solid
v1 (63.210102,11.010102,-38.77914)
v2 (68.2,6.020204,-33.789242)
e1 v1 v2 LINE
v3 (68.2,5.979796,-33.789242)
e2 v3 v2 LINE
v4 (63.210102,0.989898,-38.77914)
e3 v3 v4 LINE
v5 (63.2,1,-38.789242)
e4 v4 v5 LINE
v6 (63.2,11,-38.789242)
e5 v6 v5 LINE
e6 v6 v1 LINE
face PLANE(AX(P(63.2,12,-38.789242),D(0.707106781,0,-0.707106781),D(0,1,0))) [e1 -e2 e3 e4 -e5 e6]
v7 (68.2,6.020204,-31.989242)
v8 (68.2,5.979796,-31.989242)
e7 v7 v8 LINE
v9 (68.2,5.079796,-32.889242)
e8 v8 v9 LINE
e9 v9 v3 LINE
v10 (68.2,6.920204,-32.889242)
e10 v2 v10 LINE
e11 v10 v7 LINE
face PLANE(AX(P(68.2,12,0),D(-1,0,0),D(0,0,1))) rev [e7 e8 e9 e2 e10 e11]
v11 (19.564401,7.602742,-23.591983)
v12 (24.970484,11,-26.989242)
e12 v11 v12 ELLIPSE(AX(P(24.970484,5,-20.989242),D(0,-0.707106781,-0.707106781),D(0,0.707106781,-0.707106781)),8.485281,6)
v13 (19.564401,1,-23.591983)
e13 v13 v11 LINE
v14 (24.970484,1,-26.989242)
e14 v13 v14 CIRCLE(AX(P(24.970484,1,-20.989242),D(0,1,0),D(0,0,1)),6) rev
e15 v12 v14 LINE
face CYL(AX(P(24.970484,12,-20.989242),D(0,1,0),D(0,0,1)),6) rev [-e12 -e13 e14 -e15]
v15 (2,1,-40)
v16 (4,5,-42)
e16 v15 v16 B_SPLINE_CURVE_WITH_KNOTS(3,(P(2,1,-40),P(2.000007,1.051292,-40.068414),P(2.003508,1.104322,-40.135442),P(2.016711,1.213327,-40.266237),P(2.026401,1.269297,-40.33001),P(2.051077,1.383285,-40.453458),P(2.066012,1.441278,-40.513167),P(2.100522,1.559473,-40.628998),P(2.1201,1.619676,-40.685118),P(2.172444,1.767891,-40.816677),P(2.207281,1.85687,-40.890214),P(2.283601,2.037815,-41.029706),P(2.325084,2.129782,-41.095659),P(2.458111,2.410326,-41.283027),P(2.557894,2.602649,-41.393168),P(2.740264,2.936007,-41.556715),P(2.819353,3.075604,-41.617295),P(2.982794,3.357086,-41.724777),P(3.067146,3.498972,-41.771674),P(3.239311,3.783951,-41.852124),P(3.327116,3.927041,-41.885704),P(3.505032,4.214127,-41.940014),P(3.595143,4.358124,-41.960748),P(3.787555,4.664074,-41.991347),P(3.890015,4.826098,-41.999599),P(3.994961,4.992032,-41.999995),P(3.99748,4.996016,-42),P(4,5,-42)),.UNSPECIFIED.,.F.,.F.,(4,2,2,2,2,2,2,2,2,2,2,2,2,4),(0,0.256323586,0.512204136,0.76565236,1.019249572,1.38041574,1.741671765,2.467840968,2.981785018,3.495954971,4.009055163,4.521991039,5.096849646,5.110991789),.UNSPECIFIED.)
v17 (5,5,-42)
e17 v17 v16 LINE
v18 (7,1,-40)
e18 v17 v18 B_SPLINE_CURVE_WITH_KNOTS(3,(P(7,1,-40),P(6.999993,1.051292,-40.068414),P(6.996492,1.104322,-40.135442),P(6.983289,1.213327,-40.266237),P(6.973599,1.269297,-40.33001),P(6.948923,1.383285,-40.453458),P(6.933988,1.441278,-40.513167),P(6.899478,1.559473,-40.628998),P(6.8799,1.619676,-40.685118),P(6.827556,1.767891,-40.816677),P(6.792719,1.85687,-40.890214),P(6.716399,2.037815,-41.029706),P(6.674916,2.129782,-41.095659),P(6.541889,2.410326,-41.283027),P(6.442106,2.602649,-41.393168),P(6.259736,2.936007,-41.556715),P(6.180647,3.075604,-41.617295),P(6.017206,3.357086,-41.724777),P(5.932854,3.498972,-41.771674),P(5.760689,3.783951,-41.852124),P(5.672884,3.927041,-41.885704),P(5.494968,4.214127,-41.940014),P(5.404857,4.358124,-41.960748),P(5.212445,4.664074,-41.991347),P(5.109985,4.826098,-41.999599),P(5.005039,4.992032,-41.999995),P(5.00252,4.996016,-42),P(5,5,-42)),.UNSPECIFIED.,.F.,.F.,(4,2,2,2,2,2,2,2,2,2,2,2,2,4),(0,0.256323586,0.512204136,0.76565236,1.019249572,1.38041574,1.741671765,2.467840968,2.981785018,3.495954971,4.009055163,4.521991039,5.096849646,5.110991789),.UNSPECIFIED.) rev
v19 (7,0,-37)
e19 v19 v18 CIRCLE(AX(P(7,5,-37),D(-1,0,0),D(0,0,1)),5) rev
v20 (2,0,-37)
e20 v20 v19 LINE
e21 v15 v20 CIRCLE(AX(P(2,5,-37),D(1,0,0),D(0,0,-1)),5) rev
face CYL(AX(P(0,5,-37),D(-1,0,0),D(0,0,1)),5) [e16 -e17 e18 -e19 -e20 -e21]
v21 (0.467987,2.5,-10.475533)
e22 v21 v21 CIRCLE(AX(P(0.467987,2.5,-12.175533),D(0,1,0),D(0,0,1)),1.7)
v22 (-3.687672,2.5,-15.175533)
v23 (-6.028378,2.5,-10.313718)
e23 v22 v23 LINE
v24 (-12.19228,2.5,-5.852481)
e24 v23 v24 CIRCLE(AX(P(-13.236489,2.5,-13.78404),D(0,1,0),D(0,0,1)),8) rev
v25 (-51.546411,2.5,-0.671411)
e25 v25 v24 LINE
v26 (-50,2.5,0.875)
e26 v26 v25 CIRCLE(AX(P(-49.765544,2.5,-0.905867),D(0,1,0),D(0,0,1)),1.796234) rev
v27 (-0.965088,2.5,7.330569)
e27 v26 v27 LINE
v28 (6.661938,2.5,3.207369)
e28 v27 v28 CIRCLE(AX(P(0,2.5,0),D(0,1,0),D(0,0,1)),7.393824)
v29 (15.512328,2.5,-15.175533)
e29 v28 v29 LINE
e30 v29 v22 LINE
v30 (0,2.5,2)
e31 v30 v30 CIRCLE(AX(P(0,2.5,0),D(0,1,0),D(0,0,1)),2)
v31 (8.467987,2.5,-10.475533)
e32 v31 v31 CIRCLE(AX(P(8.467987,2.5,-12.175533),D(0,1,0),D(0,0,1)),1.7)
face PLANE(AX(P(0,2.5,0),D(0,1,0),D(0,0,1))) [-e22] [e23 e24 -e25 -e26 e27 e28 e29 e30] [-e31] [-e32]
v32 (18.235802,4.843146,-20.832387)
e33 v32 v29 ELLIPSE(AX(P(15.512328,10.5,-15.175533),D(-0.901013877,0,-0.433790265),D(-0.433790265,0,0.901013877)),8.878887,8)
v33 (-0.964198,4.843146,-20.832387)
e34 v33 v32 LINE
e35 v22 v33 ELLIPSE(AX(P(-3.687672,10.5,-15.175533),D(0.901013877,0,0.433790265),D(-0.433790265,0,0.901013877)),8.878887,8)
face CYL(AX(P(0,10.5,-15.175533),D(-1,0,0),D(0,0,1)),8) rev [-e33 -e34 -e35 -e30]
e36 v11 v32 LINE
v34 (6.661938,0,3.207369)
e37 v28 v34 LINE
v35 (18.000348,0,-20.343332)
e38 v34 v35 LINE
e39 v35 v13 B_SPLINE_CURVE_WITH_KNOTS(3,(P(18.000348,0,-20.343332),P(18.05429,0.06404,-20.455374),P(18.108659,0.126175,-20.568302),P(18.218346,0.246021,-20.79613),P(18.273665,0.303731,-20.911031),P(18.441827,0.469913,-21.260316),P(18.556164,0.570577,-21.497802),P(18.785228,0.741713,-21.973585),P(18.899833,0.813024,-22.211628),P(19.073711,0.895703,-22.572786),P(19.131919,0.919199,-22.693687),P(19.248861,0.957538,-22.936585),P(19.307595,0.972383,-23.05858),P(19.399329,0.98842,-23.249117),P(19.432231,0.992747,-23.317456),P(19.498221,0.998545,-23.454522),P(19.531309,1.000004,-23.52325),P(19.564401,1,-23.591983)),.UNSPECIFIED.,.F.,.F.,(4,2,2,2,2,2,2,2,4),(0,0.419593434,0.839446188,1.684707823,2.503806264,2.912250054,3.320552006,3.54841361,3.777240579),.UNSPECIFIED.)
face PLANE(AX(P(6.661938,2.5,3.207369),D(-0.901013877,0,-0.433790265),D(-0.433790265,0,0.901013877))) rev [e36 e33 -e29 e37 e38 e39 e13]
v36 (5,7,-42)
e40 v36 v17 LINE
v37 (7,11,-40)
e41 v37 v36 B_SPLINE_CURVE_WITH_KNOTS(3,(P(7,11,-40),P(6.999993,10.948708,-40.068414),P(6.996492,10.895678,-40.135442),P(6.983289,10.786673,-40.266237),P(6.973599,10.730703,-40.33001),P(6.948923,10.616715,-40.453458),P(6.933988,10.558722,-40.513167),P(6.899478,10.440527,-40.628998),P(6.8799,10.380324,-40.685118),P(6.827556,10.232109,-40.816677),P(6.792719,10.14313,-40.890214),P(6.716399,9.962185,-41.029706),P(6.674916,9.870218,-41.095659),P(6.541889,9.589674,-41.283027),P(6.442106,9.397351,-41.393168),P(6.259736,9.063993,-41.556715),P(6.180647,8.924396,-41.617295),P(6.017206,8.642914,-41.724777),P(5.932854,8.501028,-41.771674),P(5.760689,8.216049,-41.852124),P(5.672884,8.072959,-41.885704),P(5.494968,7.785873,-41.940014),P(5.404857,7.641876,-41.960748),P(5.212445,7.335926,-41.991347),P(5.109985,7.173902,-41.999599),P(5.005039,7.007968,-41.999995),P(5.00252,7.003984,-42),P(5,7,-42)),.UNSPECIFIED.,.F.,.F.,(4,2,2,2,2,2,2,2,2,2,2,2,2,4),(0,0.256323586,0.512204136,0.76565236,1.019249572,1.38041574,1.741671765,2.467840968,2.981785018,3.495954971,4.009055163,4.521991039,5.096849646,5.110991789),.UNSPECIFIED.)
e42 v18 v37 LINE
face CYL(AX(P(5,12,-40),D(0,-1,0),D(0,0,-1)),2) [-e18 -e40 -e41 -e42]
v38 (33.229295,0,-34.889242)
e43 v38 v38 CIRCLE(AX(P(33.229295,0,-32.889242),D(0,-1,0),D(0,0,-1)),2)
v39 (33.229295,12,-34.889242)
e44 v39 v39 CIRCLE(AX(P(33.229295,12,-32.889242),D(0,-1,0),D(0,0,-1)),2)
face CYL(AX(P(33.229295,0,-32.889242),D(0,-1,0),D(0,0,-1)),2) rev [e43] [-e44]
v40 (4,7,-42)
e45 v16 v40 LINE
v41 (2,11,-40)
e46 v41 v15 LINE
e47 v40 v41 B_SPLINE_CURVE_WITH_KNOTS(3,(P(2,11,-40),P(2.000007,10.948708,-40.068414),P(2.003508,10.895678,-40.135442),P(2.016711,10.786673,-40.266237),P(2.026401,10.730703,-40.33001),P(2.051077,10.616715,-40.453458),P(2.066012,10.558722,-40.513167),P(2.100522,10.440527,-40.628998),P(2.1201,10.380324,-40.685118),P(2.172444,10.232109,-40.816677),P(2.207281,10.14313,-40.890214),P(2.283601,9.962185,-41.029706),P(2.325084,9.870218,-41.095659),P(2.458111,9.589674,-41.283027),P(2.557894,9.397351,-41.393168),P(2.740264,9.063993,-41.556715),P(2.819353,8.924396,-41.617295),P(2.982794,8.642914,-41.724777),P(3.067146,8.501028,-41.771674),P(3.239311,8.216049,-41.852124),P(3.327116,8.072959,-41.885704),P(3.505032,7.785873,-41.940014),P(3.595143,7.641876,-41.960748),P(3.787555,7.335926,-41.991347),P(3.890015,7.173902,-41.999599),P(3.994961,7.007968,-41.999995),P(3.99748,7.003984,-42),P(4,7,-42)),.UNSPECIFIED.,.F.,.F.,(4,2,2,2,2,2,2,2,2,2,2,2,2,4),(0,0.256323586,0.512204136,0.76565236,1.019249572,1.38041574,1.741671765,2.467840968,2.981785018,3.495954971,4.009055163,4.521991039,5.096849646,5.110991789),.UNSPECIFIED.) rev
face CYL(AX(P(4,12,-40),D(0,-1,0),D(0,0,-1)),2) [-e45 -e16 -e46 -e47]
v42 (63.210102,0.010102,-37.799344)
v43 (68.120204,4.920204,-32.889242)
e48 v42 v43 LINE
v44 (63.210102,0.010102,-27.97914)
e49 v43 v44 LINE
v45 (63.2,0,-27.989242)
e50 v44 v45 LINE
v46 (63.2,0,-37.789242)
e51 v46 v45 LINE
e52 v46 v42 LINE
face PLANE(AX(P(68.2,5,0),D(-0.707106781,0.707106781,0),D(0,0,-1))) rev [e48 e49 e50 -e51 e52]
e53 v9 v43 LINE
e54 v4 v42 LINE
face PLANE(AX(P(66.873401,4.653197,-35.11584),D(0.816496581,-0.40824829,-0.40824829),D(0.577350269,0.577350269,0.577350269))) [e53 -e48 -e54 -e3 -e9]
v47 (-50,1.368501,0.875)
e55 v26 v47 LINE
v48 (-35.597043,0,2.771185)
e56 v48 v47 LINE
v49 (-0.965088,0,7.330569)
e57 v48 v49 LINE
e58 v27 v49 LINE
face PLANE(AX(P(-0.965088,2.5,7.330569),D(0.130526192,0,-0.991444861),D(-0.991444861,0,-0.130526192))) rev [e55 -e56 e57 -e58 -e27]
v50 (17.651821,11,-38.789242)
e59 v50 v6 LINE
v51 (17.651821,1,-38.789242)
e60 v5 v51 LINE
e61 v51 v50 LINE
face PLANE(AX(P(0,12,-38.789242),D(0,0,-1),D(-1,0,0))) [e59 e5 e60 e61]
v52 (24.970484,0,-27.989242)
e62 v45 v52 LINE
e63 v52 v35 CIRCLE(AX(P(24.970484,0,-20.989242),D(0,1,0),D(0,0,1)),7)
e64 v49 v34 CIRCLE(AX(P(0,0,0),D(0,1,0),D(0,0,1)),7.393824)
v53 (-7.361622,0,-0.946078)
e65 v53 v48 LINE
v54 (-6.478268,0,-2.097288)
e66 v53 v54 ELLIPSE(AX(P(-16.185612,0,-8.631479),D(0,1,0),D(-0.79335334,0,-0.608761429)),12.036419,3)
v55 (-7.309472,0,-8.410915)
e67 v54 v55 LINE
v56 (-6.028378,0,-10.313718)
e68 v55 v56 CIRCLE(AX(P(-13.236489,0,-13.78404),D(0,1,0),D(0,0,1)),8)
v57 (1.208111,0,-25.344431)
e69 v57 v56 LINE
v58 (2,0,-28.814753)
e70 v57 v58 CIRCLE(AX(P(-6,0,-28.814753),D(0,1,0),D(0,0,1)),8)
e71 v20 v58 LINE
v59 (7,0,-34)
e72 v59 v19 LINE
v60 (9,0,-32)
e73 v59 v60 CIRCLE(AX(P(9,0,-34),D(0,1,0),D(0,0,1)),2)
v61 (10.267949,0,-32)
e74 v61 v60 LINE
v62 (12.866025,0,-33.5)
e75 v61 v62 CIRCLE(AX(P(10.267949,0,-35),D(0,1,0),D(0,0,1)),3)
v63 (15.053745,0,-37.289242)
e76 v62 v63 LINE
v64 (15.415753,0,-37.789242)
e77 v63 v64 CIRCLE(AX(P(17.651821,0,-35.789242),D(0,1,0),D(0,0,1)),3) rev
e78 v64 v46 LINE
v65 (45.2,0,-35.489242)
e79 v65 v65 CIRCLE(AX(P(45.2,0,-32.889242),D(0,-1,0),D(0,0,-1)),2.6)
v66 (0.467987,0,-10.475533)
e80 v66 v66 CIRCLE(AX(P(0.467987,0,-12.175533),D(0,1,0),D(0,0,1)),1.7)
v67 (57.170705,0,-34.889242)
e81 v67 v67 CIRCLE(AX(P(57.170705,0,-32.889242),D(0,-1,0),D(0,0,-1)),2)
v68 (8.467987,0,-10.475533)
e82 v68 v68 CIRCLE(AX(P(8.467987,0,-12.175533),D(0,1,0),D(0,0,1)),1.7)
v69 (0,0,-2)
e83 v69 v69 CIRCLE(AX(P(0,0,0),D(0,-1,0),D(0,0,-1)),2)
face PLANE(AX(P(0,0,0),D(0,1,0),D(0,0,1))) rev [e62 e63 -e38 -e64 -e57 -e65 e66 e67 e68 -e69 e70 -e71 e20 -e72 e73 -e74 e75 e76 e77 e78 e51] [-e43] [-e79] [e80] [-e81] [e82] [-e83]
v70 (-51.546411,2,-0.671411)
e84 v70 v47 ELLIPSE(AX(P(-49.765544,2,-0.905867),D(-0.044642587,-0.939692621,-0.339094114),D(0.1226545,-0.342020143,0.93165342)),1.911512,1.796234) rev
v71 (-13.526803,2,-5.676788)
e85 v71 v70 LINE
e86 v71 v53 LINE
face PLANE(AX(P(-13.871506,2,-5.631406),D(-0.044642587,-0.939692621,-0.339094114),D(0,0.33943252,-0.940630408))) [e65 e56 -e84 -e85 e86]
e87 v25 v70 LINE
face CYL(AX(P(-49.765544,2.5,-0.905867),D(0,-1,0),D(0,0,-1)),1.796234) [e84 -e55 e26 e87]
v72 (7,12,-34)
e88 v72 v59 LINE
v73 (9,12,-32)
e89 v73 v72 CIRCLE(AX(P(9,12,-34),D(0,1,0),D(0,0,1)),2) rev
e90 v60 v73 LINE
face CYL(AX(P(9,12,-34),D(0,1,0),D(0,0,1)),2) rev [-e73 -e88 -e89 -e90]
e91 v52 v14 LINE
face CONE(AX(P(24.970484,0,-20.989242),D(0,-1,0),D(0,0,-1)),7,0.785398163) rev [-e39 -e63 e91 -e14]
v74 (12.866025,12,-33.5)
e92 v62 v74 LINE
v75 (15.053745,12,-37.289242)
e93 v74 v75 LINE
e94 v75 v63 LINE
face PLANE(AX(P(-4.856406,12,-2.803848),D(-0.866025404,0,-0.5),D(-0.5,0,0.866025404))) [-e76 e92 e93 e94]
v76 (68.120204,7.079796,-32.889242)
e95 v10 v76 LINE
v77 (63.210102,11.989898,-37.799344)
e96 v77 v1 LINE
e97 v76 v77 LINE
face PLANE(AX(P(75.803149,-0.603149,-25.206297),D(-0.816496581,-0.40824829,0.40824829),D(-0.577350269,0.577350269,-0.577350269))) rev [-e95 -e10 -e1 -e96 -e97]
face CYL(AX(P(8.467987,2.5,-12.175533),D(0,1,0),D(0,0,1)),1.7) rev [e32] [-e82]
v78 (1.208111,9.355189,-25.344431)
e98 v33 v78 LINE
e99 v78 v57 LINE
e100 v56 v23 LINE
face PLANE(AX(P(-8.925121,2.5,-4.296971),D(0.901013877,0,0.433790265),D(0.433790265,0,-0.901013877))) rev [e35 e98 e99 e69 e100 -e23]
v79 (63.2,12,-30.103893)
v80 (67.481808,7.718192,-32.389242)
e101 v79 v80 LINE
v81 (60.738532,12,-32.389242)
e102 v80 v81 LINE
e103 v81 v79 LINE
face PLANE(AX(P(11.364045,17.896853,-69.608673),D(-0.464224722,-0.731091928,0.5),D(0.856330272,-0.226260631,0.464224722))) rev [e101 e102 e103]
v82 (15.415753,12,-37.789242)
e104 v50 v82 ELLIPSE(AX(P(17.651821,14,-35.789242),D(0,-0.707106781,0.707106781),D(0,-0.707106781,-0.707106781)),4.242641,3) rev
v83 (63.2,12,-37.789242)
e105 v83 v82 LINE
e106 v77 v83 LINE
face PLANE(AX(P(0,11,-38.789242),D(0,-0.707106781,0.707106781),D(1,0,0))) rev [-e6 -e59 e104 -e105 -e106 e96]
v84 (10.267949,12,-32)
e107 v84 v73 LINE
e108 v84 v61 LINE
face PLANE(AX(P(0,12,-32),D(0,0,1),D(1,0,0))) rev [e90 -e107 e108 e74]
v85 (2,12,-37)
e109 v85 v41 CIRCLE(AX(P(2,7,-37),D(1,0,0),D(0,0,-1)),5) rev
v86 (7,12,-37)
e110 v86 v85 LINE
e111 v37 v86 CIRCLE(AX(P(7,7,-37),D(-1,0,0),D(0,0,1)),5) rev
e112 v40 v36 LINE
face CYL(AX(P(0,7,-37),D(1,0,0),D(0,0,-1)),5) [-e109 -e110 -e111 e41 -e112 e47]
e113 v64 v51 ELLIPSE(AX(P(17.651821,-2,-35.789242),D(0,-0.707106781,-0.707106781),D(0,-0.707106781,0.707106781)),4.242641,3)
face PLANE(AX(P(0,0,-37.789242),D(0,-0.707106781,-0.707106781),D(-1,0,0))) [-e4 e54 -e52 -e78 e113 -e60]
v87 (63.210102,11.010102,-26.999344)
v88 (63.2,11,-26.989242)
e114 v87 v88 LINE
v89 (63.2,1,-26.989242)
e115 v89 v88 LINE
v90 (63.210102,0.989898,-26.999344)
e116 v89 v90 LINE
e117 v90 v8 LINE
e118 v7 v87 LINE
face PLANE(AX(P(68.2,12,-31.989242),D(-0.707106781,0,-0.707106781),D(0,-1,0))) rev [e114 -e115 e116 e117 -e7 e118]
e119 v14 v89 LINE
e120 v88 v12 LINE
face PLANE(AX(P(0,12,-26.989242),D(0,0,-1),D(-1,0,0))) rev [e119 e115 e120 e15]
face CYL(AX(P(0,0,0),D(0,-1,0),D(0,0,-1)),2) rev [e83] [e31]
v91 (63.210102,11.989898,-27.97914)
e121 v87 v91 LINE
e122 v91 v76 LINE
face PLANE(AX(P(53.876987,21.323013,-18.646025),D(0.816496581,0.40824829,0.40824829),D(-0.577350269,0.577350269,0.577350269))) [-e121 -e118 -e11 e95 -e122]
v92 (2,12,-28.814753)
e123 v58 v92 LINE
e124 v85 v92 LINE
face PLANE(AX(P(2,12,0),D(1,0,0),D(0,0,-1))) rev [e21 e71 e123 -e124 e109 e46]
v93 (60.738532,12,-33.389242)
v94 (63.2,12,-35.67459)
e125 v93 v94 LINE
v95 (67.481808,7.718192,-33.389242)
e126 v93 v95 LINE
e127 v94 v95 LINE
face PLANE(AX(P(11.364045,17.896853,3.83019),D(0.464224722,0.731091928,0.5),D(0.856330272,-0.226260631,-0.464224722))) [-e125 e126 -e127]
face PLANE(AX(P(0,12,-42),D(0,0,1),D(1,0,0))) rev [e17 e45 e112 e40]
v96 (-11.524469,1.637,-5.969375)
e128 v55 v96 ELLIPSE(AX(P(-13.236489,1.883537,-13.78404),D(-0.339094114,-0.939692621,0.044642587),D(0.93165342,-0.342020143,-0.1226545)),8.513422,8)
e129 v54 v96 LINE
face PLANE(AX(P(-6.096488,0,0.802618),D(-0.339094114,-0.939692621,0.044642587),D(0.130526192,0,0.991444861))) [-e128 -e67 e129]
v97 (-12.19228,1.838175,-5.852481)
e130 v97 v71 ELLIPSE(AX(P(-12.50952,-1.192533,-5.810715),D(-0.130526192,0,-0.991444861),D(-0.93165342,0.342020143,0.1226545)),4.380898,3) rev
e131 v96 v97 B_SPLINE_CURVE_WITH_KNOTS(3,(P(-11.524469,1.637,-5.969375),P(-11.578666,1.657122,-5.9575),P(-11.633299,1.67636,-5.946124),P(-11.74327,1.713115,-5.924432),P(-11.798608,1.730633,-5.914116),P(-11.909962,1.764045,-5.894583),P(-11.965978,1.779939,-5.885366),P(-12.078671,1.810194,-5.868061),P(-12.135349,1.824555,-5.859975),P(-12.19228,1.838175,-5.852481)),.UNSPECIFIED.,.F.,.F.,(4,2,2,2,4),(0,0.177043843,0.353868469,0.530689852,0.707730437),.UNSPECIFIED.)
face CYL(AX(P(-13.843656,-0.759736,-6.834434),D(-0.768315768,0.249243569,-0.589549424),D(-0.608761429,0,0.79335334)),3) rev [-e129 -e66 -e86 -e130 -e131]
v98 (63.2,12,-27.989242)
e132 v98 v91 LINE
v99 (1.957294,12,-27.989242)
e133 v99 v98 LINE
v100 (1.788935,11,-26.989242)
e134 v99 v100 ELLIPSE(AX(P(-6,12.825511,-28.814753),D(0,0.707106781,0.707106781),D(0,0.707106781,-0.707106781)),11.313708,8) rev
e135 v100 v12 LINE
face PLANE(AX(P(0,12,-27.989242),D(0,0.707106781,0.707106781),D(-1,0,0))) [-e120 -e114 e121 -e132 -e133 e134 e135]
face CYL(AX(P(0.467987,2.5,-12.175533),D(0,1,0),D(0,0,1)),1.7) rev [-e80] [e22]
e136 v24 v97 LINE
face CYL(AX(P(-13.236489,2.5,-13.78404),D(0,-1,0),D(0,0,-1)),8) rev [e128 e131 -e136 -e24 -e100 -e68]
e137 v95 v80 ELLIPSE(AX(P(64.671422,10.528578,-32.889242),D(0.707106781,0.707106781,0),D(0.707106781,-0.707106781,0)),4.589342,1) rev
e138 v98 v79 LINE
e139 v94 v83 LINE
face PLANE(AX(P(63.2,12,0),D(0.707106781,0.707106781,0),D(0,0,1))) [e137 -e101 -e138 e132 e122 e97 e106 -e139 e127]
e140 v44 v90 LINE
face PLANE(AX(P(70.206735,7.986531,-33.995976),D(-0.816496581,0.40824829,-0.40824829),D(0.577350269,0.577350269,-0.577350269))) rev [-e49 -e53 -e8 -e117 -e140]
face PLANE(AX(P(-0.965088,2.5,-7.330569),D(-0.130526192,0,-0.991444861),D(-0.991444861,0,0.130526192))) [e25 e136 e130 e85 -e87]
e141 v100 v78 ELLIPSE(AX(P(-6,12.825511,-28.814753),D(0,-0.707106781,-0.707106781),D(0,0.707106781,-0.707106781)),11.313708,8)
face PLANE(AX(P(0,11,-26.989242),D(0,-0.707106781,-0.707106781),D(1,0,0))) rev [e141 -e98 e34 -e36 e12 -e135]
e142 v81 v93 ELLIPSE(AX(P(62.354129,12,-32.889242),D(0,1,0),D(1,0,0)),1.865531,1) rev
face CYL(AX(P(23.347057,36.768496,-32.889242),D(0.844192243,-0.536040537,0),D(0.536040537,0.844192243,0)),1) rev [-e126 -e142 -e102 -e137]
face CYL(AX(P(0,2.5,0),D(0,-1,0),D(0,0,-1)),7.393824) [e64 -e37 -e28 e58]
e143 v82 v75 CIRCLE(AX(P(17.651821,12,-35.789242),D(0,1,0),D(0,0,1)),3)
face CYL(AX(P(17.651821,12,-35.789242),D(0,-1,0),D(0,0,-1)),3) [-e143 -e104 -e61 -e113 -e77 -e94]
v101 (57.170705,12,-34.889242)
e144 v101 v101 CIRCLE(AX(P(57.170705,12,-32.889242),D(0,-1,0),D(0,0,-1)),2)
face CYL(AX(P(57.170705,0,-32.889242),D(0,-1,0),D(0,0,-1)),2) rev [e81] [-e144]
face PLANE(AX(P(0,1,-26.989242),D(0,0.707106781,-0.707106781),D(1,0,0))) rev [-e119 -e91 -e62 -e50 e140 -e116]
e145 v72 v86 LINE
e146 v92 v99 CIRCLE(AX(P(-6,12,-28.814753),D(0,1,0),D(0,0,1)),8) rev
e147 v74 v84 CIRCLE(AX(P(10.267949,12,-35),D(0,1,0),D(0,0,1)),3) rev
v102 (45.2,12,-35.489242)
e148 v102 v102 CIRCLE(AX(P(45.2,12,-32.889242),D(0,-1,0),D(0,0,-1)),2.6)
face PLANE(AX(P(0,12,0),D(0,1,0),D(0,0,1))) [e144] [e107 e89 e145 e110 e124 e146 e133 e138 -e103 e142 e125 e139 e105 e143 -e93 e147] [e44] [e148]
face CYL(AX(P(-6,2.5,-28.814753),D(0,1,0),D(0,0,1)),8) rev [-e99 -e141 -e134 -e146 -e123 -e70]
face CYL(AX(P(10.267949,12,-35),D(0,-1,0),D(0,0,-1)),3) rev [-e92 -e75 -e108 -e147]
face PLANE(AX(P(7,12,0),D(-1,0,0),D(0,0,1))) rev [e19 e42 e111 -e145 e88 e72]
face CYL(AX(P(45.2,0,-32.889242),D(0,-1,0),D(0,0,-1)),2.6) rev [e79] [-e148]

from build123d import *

# Parameters (mm, degrees)
BOSS_EXTRUDE1_DEPTH          = 2.5
BOSS_EXTRUDE2_DEPTH          = 12
F_4_0_4_DIAMETER_HOLE1_D     = 4
F_4_0_4_DIAMETER_HOLE2_D     = 4
F_5_2_5_2_DIAMETER_HOLE1_D   = 5.2
CHAMFER5_SIZE                = 8.5
FILLET13_R                   = 6
CHAMFER1_SIZE                = 5
CHAMFER2_SIZE                = 1
CHAMFER4_SIZE                = 0.8
CUT_REVOLVE1_ANGLE           = 60
CUT_REVOLVE1_OTHER_WAY_ANGLE = 60
FILLET4_R                    = 1
FILLET5_R                    = 8
FILLET6_R                    = 3
FILLET7_R                    = 2
FILLET11_R                   = 5
FILLET12_R                   = 2
CUT_EXTRUDE2_DEPTH           = 38
CHAMFER8_SIZE                = 6.868693549
CHAMFER8_SIZE_2              = 2.5
FILLET14_R                   = 3
M3_CLEARANCE_HOLE1_D         = 3.4


with BuildPart() as part:
    # Sketch1 → Boss-Extrude1 (new body)
    with BuildSketch(Plane(origin=(0, 0, 0), x_dir=(1, 0, 0), z_dir=(0, 1, 0))):
        with BuildLine():
            Line((-7.904447763, 6.416984589), (-51.546411114, 0.671411114))
            ThreePointArc((-51.546411114, 0.671411114), (-51.035673477, -0.364262362), (-50, -0.875))
            Line((-50, -0.875), (-0.965087675, -7.330568677))
            ThreePointArc((-0.965087675, -7.330568677), (3.516208172, -6.504222585), (6.661937904, -3.207368814))
            Line((6.661937904, -3.207368814), (21.2, 26.989241728))
            Line((21.2, 26.989241728), (2, 26.989241728))
            Line((2, 26.989241728), (-7.904447763, 6.416984589))
        make_face()
    extrude(amount=BOSS_EXTRUDE1_DEPTH)

    # Sketch1<6> → Boss-Extrude2 (add)
    with BuildSketch(Plane(origin=(0, 0, 0), x_dir=(1, 0, 0), z_dir=(0, 1, 0))):
        Polygon((2, 42), (2, 26.989241728), (68.2, 26.989241728), (68.2, 38.789241728), (15.919770539, 38.789241728), (12, 32), (7, 32), (7, 42), align=None)
    extrude(amount=BOSS_EXTRUDE2_DEPTH)

    # Ø4.0 (4) Diameter Hole1 (through all)
    with Locations(Plane(origin=(0, 0, 0), x_dir=(-1, 0, 0), z_dir=(0, -1, 0))):
        with Locations((-57.170705016, 32.889241728), (-33.229294984, 32.889241728)):
            Hole(F_4_0_4_DIAMETER_HOLE1_D / 2)

    # Ø4.0 (4) Diameter Hole2 (through all)
    with Locations(Plane(origin=(0, 0, 0), x_dir=(-1, 0, 0), z_dir=(0, -1, 0))):
        with Locations((0, 0)):
            Hole(F_4_0_4_DIAMETER_HOLE2_D / 2)

    # Ø5.2 (5.2) Diameter Hole1 (through all)
    with Locations(Plane(origin=(0, 0, 0), x_dir=(-1, 0, 0), z_dir=(0, -1, 0))):
        with Locations((-45.2, 32.889241728)):
            Hole(F_5_2_5_2_DIAMETER_HOLE1_D / 2)

    # Chamfer5
    chamfer5_edges = [part.edges().sort_by_distance(p)[0] for p in [
        (11.6, 2.5, -26.989241728),
    ]]
    chamfer(chamfer5_edges, length=CHAMFER5_SIZE)

    # Fillet13
    fillet13_edges = [part.edges().sort_by_distance(p)[0] for p in [
        (21.2, 5.5, -26.989241728),
    ]]
    fillet(fillet13_edges, radius=FILLET13_R)

    # Chamfer1
    chamfer1_edges = [part.edges().sort_by_distance(p)[0] for p in [
        (68.2, 0, -32.889241728),
        (68.2, 6, -26.989241728),
        (68.2, 6, -38.789241728),
        (68.2, 12, -32.889241728),
    ]]
    chamfer(chamfer1_edges, length=CHAMFER1_SIZE)

    # Chamfer2
    # the kernel refuses this chamfer: 1 mm, written as the material it takes off along each edge
    with BuildSketch(Plane(origin=(24.970484005, 0, -26.989241728), x_dir=(0, 0, -1), z_dir=(1, 0, 0))) as chamfer2_piece_1:
        Polygon((CHAMFER2_SIZE, 0), (0, CHAMFER2_SIZE), (0, 0), align=None)
    extrude(amount=40.801198983, mode=Mode.SUBTRACT)
    with BuildSketch(Plane(origin=(-0.571682988, 12, -26.989241728), x_dir=(0, -1, 0), z_dir=(1, 0, 0))) as chamfer2_piece_2:
        Polygon((CHAMFER2_SIZE, 0), (0, CHAMFER2_SIZE), (0, 0), align=None)
    extrude(amount=66.343365976, mode=Mode.SUBTRACT)
    with BuildSketch(Plane(origin=(65.771682988, 12, -38.789241728), x_dir=(0, -1, 0), z_dir=(-1, 0, 0)), Plane(origin=(65.771682988, 0, -38.789241728), x_dir=(0, 0, 1), z_dir=(-1, 0, 0))) as chamfer2_piece_3:
        Polygon((CHAMFER2_SIZE, 0), (0, CHAMFER2_SIZE), (0, 0), align=None)
    extrude(amount=52.423595437, mode=Mode.SUBTRACT)
    with BuildSketch(Plane(origin=(24.970484005, 0, -20.989241728), x_dir=(-0.9610284466527214, -1.1097335043339142e-15, 0.27644949760174536), z_dir=(0.27644949760174536, 0, 0.9610284466527214))) as chamfer2_piece_4:
        Polygon((6 + CHAMFER2_SIZE, 0), (6, -CHAMFER2_SIZE), (6, 0), align=None)
    revolve(axis=Axis((24.970484005, 0, -20.989241728), (0, -1, 0)), revolution_arc=106.048413393, mode=Mode.SUBTRACT)

    # Chamfer4
    # the kernel refuses this chamfer: 0.8 mm, written as the material it takes off along each edge
    with BuildSketch(Plane(origin=(62.505076275, -0.694923725, -39.484165453), x_dir=(-0.40824829046386635, -0.4082482904638597, 0.816496580927726), z_dir=(0.5773502691896258, 0.5773502691896258, 0.5773502691896258)), Plane(origin=(62.505076275, 12.694923725, -39.484165453), x_dir=(-0.40824829046386746, -0.816496580927726, -0.4082482904638586), z_dir=(0.5773502691896258, -0.5773502691896258, 0.5773502691896258)), Plane(origin=(69.394923725, 5.805076275, -33.184165453), x_dir=(-0.408248290463863, -0.816496580927726, 0.408248290463863), z_dir=(-0.5773502691896258, 0.5773502691896258, 0.5773502691896258))) as chamfer4_piece_1:
        Polygon((CHAMFER4_SIZE, 0), (-CHAMFER4_SIZE * 0.5, -CHAMFER4_SIZE * 0.866025403784), (0, 0), align=None)
    extrude(amount=11.933565841, mode=Mode.SUBTRACT)
    with BuildSketch(Plane(origin=(62.505076275, -0.694923725, -26.294318002), x_dir=(-0.4082482904638641, -0.4082482904638619, -0.816496580927726), z_dir=(0.5773502691896258, 0.5773502691896258, -0.5773502691896258))) as chamfer4_piece_2:
        Polygon((CHAMFER4_SIZE, 0), (-CHAMFER4_SIZE * 0.5, CHAMFER4_SIZE * 0.866025403784), (0, 0), align=None)
    extrude(amount=11.933565841, mode=Mode.SUBTRACT)

    # Sketch7 → Cut-Revolve1 (revolve, cut)
    with BuildSketch(Plane.XY.offset(-32.889241728)):
        Polygon((68.2, 6.920204103), (60.2, 12), (60.2, 14), (68.2, 14), align=None)
    revolve(axis=Axis((68.2, 6.920204103, -32.889241728), (-0.8441922430161829, 0.5360405365560577, 0)), revolution_arc=CUT_REVOLVE1_ANGLE, mode=Mode.SUBTRACT)

    # Sketch7 → Cut-Revolve1 other way (revolve, cut)
    with BuildSketch(Plane.XY.offset(-32.889241728)):
        Polygon((68.2, 6.920204103), (60.2, 12), (60.2, 14), (68.2, 14), align=None)
    revolve(axis=Axis((68.2, 6.920204103, -32.889241728), (0.8441922430161829, -0.5360405365560577, 0)), revolution_arc=CUT_REVOLVE1_OTHER_WAY_ANGLE, mode=Mode.SUBTRACT)

    # Fillet4
    # the kernel refuses this fillet: 1 mm, written as the material it adds along each edge
    with BuildSketch(Plane(origin=(69.418486547, 6.146496233, -32.889241728), x_dir=(0.26802026827802927, 0.42209612150809256, -0.8660254037844378), z_dir=(-0.8441922430161831, 0.5360405365560573, 0))) as fillet4_piece_1_section:
        with BuildLine():
            CenterArc((FILLET4_R * 0.57735026919, -FILLET4_R), FILLET4_R, 90, 60)
            Line((-FILLET4_R * 0.288675134595, -FILLET4_R * 0.5), (0, 0))
            Line((0, 0), (FILLET4_R * 0.57735026919, 0))
        make_face()
    fillet4_piece_1 = extrude(amount=12.363265808, mode=Mode.PRIVATE)
    fillet4_piece_1 = split(fillet4_piece_1, bisect_by=Plane(origin=(69.418486547, 12, -32.889241728), z_dir=(0, -1, 0)), keep=Keep.TOP, mode=Mode.PRIVATE)
    fillet4_piece_1 = split(fillet4_piece_1, bisect_by=Plane(origin=(68.864064806, 5.869285362, -33.166452598), z_dir=(-0.8164965809277263, -0.4082482904637079, -0.4082482904640183)), keep=Keep.TOP, mode=Mode.PRIVATE)
    fillet4_piece_1 = split(fillet4_piece_1, bisect_by=Plane(origin=(69.235995157, 5.964004843, -32.889241728), z_dir=(-0.7071067811865476, -0.7071067811865476, 0)), keep=Keep.TOP, mode=Mode.PRIVATE)
    fillet4_piece_1 = split(fillet4_piece_1, bisect_by=Plane(origin=(68.864064806, 5.869285362, -32.612030857), z_dir=(-0.8164965809277263, -0.4082482904637079, 0.4082482904640183)), keep=Keep.TOP, mode=Mode.PRIVATE)
    add(fillet4_piece_1)

    # Fillet5
    fillet5_edges = [part.edges().sort_by_distance(p)[0] for p in [
        (7.507702037, 2.5, -18.489241728),
        (-7.904447763, 1.25, -6.416984589),
        (2, 5.5, -26.989241728),
    ]]
    fillet(fillet5_edges, radius=FILLET5_R)

    # Fillet6
    fillet6_edges = [part.edges().sort_by_distance(p)[0] for p in [
        (15.919770539, 6, -38.789241728),
        (12, 6, -32),
    ]]
    fillet(fillet6_edges, radius=FILLET6_R)

    # Fillet7
    fillet7_edges = [part.edges().sort_by_distance(p)[0] for p in [
        (7, 6, -32),
    ]]
    fillet(fillet7_edges, radius=FILLET7_R)

    # Fillet11
    fillet11_edges = [part.edges().sort_by_distance(p)[0] for p in [
        (4.5, 0, -42),
        (4.5, 12, -42),
    ]]
    fillet(fillet11_edges, radius=FILLET11_R)

    # Fillet12
    # the kernel refuses this fillet: 2 mm, written as the material it takes off along each edge
    with BuildSketch(Plane(origin=(2, 0, -42), x_dir=(0, 0, 1), z_dir=(0, 1, 0))) as fillet12_piece_1:
        with BuildLine():
            CenterArc((FILLET12_R, FILLET12_R), FILLET12_R, 180, 90)
            Line((0, FILLET12_R), (0, 0))
            Line((0, 0), (FILLET12_R, 0))
        make_face()
    extrude(amount=12, mode=Mode.SUBTRACT)
    with BuildSketch(Plane(origin=(7, 0, -42), x_dir=(0, 0, 1), z_dir=(0, 1, 0))) as fillet12_piece_2:
        with BuildLine():
            CenterArc((FILLET12_R, -FILLET12_R), FILLET12_R, 90, 90)
            Line((0, -FILLET12_R), (0, 0))
            Line((0, 0), (FILLET12_R, 0))
        make_face()
    extrude(amount=12, mode=Mode.SUBTRACT)

    # Sketch11 → Cut-Extrude2 (cut)
    with BuildSketch(Plane(origin=(-50.581323439, 0, 6.659157562), x_dir=(0, -1, 0), z_dir=(0.9914448613738103, 0, -0.1305261922200527))):
        Polygon((-2, 7.393823865), (0, 1.898869026), (0, 7.393823865), align=None)
    extrude(amount=CUT_EXTRUDE2_DEPTH, mode=Mode.SUBTRACT)

    # Chamfer8
    # the kernel refuses this chamfer: 6.868693549, 2.5 mm, written as the material it takes off along each edge
    with BuildSketch(Plane(origin=(-10.828460053, 0, 17.48282525), x_dir=(0.9914448613738103, 0, -0.1305261922200527), z_dir=(-0.1305261922200527, 0, -0.9914448613738103))) as chamfer8_piece_1_section:
        Polygon((CHAMFER8_SIZE, 0), (0, -CHAMFER8_SIZE_2), (0, 0), align=None)
    chamfer8_piece_1 = extrude(amount=41.132412086, mode=Mode.PRIVATE)
    chamfer8_piece_1 = split(chamfer8_piece_1, bisect_by=Plane(origin=(-11.100528233, -5.72682899, 15.416262251), z_dir=(-0.04464258697085675, -0.939692620785907, -0.3390941135865724)), keep=Keep.TOP, mode=Mode.PRIVATE)
    add(chamfer8_piece_1, mode=Mode.SUBTRACT)

    # Fillet14
    fillet14_edges = [part.edges().sort_by_distance(p)[0] for p in [
        (-9.426930062, 1, -3.445360698),
    ]]
    fillet(fillet14_edges, radius=FILLET14_R)

    # M3 Clearance Hole1 (through all)
    with Locations(Plane(origin=(0, 2.5, 0), x_dir=(1, 0, 0), z_dir=(0, 1, 0))):
        with Locations((0.467987162, 12.175533229), (8.467987162, 12.175533229)):
            Hole(M3_CLEARANCE_HOLE1_D / 2)


solid = part.part
